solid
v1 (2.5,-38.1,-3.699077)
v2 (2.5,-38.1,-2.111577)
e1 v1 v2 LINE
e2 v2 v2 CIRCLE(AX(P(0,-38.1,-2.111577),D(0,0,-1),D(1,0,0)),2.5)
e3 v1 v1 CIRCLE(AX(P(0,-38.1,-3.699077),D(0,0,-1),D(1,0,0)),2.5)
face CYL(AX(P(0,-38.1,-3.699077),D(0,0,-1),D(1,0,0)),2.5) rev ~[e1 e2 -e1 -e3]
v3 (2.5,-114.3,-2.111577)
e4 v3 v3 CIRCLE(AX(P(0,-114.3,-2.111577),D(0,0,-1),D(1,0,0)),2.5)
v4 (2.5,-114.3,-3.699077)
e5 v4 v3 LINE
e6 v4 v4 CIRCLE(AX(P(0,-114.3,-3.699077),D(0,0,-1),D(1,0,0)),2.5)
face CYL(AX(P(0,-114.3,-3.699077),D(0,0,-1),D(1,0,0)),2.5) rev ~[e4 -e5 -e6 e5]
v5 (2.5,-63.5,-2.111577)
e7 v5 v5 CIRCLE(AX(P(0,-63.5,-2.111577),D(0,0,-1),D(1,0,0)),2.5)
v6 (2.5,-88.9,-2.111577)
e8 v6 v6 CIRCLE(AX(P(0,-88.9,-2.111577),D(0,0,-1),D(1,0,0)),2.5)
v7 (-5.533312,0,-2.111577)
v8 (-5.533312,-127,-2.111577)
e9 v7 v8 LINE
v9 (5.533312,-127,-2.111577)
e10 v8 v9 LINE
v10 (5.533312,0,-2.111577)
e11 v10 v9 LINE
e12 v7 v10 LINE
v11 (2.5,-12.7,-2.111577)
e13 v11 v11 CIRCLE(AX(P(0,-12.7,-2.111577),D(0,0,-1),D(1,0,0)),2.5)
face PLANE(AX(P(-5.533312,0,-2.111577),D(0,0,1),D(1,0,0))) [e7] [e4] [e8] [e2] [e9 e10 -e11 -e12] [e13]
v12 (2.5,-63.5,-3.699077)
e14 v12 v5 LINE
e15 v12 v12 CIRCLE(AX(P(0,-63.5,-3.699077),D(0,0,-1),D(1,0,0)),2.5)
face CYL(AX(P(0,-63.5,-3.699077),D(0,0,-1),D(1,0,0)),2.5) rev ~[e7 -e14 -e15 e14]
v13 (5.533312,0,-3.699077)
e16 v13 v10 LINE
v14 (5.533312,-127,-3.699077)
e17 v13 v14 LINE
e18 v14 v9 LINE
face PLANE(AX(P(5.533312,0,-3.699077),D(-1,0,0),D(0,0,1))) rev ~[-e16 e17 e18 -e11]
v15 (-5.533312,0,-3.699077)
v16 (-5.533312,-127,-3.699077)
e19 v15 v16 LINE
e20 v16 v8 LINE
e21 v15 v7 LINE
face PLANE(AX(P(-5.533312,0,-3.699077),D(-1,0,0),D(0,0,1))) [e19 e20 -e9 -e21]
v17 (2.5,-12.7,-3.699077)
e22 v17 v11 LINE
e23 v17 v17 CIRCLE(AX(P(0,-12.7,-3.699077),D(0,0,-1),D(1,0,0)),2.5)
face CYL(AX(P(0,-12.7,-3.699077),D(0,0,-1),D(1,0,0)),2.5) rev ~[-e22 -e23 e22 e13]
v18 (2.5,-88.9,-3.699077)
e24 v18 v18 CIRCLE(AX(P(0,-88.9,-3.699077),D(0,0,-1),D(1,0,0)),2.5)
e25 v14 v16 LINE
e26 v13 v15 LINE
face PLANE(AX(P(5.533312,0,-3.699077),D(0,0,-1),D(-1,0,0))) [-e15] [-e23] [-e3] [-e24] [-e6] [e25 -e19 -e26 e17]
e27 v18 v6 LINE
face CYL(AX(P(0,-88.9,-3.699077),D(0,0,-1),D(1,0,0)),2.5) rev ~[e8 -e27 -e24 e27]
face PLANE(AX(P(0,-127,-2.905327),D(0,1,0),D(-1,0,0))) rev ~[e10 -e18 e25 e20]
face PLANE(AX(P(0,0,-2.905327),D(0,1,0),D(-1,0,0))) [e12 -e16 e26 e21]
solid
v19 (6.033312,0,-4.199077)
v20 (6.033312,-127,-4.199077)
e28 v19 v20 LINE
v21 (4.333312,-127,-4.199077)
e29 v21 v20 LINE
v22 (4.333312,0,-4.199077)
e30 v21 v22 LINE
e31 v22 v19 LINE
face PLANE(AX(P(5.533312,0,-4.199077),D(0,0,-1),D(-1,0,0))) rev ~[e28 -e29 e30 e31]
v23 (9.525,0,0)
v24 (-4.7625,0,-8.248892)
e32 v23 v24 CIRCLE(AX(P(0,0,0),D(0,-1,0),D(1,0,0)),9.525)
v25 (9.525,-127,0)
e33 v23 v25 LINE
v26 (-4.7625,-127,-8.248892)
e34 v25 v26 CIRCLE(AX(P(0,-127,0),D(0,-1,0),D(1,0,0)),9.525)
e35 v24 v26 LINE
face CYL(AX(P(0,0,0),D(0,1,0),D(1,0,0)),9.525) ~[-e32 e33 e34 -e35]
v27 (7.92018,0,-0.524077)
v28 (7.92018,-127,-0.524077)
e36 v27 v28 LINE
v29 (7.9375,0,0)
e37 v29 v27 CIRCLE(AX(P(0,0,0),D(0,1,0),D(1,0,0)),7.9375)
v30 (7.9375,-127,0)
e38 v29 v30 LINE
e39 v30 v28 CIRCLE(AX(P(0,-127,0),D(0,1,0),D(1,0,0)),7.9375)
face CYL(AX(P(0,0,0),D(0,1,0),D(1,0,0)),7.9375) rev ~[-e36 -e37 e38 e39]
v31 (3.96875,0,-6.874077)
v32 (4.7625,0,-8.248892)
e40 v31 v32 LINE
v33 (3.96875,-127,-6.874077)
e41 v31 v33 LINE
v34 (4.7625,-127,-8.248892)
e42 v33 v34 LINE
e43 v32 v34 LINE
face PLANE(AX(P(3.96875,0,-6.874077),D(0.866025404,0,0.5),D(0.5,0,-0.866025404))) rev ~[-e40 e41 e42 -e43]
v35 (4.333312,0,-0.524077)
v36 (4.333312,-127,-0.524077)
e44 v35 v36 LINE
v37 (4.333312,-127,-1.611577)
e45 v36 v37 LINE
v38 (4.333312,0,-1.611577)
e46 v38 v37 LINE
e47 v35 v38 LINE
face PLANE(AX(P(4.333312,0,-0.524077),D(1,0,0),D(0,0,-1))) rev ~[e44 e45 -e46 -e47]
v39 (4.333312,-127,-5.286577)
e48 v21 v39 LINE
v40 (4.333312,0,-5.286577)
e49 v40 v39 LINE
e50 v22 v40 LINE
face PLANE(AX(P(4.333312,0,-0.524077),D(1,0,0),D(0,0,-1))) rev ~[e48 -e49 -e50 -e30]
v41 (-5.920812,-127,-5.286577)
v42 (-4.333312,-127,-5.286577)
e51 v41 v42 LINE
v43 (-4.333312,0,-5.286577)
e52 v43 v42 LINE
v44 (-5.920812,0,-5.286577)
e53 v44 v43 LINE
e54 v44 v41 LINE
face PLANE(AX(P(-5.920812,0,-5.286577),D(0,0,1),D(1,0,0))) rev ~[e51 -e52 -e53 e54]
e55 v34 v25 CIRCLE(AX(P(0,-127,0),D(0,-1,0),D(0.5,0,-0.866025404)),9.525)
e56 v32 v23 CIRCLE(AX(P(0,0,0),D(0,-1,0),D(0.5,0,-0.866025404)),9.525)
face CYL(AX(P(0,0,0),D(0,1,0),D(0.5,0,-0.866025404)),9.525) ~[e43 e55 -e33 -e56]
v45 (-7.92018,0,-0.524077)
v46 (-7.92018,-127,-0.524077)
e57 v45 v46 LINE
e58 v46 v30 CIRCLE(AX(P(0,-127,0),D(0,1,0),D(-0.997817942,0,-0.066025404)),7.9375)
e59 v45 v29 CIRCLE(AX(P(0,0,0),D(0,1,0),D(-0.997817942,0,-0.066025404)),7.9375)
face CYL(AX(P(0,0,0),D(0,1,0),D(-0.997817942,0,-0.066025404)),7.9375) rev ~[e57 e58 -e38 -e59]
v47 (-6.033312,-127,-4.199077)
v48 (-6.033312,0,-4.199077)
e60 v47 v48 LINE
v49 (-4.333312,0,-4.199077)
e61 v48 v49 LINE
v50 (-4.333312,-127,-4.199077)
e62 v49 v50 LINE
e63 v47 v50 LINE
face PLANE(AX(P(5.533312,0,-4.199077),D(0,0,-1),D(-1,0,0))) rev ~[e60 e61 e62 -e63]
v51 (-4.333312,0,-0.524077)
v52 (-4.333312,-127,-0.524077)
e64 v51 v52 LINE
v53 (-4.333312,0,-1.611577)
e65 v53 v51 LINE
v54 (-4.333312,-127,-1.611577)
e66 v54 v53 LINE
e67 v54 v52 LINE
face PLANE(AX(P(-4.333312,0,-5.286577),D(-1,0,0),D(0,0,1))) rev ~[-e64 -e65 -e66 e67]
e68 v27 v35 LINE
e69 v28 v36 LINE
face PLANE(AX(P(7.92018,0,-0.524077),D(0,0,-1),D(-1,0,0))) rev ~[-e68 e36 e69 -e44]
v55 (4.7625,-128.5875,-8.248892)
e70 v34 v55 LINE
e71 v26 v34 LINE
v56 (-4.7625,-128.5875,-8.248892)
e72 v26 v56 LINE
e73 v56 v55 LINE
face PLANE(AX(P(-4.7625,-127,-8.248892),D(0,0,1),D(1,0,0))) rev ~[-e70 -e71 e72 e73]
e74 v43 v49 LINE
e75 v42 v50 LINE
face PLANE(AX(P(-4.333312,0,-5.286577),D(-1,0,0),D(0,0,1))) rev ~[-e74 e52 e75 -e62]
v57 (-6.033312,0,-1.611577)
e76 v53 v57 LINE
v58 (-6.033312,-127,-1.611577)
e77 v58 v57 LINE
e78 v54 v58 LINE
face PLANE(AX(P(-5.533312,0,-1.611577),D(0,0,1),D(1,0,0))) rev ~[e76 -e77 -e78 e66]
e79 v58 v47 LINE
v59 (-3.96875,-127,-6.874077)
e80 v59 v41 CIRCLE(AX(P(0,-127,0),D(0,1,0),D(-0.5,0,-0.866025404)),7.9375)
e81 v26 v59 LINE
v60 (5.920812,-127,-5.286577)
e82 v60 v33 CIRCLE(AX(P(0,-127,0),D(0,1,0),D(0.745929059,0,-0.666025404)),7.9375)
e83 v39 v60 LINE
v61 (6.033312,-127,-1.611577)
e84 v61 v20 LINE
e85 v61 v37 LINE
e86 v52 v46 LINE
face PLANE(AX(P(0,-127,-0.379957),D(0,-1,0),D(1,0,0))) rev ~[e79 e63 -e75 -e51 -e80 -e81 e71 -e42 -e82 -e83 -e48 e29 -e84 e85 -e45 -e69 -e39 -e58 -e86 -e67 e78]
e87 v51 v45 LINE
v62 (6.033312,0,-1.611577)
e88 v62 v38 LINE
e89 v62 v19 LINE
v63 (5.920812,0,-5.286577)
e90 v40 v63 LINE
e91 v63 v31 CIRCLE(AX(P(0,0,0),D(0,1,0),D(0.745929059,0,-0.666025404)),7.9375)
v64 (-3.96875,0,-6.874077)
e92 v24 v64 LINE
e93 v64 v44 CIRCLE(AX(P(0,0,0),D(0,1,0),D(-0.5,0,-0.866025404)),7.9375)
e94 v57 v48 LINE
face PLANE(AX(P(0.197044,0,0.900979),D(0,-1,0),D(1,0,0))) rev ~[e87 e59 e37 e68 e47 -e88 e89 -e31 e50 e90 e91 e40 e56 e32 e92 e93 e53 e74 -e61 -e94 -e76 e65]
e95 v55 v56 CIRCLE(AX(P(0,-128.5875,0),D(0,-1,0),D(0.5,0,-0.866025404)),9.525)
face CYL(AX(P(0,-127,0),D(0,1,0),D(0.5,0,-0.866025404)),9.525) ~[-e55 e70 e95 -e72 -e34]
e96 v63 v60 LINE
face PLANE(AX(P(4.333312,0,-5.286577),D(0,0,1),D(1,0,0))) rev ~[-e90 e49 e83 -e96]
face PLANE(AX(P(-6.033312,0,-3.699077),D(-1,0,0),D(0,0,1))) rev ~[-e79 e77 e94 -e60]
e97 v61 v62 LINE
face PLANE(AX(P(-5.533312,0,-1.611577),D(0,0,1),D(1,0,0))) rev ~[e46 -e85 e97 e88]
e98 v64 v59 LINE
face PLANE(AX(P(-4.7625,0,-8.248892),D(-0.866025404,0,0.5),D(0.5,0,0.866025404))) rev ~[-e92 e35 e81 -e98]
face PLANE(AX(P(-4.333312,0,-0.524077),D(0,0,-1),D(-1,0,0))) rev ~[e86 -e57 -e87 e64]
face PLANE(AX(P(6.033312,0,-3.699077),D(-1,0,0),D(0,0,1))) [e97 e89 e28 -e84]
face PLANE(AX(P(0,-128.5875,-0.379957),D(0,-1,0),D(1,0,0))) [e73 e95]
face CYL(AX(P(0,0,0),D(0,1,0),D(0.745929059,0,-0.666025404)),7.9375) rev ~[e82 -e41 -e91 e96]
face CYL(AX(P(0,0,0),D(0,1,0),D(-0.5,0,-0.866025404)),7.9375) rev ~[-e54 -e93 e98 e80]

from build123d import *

# Parameters (mm, degrees)
F1_DEPTH  = 127
F2_W      = 8.6666238164
F2_H      = 1.5875
F2_W_2    = 1.2
F3_DEPTH  = 127
F4_OFFSET = 0.5
F6_DEPTH  = 1.5875
F7_R      = 2.5
F8_DEPTH  = 1.5875


with BuildPart() as f1:
    # F0 (on Front) → F1 (new body)
    with BuildSketch(Plane.XZ):
        with BuildLine():
            ThreePointArc((-7.9201799173, -0.5240766425), (-0.262181384, 7.9331687976), (7.9375, 0))
            ThreePointArc((7.9375, 0), (7.9331687976, -0.262181384), (7.9201799173, -0.5240766425))
            ThreePointArc((7.9201799173, -0.5240766425), (7.3187167756, -3.0725056564), (5.9208119082, -5.2865766425))
            ThreePointArc((5.9208119082, -5.2865766425), (5.0080832408, -6.1581660016), (3.96875, -6.8740766425))
            Line((3.96875, -6.8740766425), (4.7625, -8.248891971))
            ThreePointArc((4.7625, -8.248891971), (8.248891971, -4.7625), (9.525, 0))
            ThreePointArc((9.525, 0), (-4.7625, 8.248891971), (-4.7625, -8.248891971))
            Line((-4.7625, -8.248891971), (-3.96875, -6.8740766425))
            ThreePointArc((-3.96875, -6.8740766425), (-5.0080832408, -6.1581660016), (-5.9208119082, -5.2865766425))
            ThreePointArc((-5.9208119082, -5.2865766425), (-7.3187167756, -3.0725056564), (-7.9201799173, -0.5240766425))
        make_face()
        with BuildLine():
            Line((-4.3333119082, -0.5240766425), (-7.9201799173, -0.5240766425))
            ThreePointArc((-7.9201799173, -0.5240766425), (-7.3187167756, -3.0725056564), (-5.9208119082, -5.2865766425))
            Line((-5.9208119082, -5.2865766425), (-4.3333119082, -5.2865766425))
            Line((-4.3333119082, -5.2865766425), (-4.3333119082, -0.5240766425))
        make_face()
        with BuildLine():
            ThreePointArc((5.9208119082, -5.2865766425), (7.3187167756, -3.0725056564), (7.9201799173, -0.5240766425))
            Line((7.9201799173, -0.5240766425), (4.3333119082, -0.5240766425))
            Line((4.3333119082, -0.5240766425), (4.3333119082, -5.2865766425))
            Line((4.3333119082, -5.2865766425), (5.9208119082, -5.2865766425))
        make_face()
    extrude(amount=F1_DEPTH)


with BuildPart() as f3:
    # F2 (on face) → F3 (new body, through all)
    with BuildSketch(Plane(origin=(0, 0, 0), x_dir=(-1, 0, 0), z_dir=(0, 1, 0))):
        with Locations((0, -2.9053266425)):
            Rectangle(F2_W, F2_H)
        with Locations((-4.9333119082, -2.9053266425)):
            Rectangle(F2_W_2, F2_H)
        with Locations((4.9333119082, -2.9053266425)):
            Rectangle(F2_W_2, F2_H)
    extrude(amount=-F3_DEPTH)


with BuildPart() as f1_1:
    add(f1.part)

    # F4: cut F3, made larger all round first
    f4_tool = offset(f3.part, amount=F4_OFFSET, kind=Kind.INTERSECTION, mode=Mode.PRIVATE)
    add(f4_tool, mode=Mode.SUBTRACT)

    # F5 (on face) → F6 (join)
    with BuildSketch(Plane.XZ.offset(127)):
        with BuildLine():
            Line((-4.7625, -8.248891971), (4.7625, -8.248891971))
            ThreePointArc((4.7625, -8.248891971), (0, 9.525), (-4.7625, -8.248891971))
        make_face()
    extrude(amount=F6_DEPTH)


with BuildPart() as f3_1:
    add(f3.part)

    # F7 (on face) → F8 (cut, through all)
    with BuildSketch(Plane(origin=(0, 0, -3.6990766425), x_dir=(1, 0, 0), z_dir=(0, 0, -1))):
        with Locations((0, 12.7)):
            Circle(F7_R)
        with Locations((0, 38.1)):
            Circle(F7_R)
        with Locations((0, 63.5)):
            Circle(F7_R)
        with Locations((0, 88.9)):
            Circle(F7_R)
        with Locations((0, 114.3)):
            Circle(F7_R)
    extrude(amount=-F8_DEPTH, mode=Mode.SUBTRACT)


solid = Compound([f1_1.part, f3_1.part])
